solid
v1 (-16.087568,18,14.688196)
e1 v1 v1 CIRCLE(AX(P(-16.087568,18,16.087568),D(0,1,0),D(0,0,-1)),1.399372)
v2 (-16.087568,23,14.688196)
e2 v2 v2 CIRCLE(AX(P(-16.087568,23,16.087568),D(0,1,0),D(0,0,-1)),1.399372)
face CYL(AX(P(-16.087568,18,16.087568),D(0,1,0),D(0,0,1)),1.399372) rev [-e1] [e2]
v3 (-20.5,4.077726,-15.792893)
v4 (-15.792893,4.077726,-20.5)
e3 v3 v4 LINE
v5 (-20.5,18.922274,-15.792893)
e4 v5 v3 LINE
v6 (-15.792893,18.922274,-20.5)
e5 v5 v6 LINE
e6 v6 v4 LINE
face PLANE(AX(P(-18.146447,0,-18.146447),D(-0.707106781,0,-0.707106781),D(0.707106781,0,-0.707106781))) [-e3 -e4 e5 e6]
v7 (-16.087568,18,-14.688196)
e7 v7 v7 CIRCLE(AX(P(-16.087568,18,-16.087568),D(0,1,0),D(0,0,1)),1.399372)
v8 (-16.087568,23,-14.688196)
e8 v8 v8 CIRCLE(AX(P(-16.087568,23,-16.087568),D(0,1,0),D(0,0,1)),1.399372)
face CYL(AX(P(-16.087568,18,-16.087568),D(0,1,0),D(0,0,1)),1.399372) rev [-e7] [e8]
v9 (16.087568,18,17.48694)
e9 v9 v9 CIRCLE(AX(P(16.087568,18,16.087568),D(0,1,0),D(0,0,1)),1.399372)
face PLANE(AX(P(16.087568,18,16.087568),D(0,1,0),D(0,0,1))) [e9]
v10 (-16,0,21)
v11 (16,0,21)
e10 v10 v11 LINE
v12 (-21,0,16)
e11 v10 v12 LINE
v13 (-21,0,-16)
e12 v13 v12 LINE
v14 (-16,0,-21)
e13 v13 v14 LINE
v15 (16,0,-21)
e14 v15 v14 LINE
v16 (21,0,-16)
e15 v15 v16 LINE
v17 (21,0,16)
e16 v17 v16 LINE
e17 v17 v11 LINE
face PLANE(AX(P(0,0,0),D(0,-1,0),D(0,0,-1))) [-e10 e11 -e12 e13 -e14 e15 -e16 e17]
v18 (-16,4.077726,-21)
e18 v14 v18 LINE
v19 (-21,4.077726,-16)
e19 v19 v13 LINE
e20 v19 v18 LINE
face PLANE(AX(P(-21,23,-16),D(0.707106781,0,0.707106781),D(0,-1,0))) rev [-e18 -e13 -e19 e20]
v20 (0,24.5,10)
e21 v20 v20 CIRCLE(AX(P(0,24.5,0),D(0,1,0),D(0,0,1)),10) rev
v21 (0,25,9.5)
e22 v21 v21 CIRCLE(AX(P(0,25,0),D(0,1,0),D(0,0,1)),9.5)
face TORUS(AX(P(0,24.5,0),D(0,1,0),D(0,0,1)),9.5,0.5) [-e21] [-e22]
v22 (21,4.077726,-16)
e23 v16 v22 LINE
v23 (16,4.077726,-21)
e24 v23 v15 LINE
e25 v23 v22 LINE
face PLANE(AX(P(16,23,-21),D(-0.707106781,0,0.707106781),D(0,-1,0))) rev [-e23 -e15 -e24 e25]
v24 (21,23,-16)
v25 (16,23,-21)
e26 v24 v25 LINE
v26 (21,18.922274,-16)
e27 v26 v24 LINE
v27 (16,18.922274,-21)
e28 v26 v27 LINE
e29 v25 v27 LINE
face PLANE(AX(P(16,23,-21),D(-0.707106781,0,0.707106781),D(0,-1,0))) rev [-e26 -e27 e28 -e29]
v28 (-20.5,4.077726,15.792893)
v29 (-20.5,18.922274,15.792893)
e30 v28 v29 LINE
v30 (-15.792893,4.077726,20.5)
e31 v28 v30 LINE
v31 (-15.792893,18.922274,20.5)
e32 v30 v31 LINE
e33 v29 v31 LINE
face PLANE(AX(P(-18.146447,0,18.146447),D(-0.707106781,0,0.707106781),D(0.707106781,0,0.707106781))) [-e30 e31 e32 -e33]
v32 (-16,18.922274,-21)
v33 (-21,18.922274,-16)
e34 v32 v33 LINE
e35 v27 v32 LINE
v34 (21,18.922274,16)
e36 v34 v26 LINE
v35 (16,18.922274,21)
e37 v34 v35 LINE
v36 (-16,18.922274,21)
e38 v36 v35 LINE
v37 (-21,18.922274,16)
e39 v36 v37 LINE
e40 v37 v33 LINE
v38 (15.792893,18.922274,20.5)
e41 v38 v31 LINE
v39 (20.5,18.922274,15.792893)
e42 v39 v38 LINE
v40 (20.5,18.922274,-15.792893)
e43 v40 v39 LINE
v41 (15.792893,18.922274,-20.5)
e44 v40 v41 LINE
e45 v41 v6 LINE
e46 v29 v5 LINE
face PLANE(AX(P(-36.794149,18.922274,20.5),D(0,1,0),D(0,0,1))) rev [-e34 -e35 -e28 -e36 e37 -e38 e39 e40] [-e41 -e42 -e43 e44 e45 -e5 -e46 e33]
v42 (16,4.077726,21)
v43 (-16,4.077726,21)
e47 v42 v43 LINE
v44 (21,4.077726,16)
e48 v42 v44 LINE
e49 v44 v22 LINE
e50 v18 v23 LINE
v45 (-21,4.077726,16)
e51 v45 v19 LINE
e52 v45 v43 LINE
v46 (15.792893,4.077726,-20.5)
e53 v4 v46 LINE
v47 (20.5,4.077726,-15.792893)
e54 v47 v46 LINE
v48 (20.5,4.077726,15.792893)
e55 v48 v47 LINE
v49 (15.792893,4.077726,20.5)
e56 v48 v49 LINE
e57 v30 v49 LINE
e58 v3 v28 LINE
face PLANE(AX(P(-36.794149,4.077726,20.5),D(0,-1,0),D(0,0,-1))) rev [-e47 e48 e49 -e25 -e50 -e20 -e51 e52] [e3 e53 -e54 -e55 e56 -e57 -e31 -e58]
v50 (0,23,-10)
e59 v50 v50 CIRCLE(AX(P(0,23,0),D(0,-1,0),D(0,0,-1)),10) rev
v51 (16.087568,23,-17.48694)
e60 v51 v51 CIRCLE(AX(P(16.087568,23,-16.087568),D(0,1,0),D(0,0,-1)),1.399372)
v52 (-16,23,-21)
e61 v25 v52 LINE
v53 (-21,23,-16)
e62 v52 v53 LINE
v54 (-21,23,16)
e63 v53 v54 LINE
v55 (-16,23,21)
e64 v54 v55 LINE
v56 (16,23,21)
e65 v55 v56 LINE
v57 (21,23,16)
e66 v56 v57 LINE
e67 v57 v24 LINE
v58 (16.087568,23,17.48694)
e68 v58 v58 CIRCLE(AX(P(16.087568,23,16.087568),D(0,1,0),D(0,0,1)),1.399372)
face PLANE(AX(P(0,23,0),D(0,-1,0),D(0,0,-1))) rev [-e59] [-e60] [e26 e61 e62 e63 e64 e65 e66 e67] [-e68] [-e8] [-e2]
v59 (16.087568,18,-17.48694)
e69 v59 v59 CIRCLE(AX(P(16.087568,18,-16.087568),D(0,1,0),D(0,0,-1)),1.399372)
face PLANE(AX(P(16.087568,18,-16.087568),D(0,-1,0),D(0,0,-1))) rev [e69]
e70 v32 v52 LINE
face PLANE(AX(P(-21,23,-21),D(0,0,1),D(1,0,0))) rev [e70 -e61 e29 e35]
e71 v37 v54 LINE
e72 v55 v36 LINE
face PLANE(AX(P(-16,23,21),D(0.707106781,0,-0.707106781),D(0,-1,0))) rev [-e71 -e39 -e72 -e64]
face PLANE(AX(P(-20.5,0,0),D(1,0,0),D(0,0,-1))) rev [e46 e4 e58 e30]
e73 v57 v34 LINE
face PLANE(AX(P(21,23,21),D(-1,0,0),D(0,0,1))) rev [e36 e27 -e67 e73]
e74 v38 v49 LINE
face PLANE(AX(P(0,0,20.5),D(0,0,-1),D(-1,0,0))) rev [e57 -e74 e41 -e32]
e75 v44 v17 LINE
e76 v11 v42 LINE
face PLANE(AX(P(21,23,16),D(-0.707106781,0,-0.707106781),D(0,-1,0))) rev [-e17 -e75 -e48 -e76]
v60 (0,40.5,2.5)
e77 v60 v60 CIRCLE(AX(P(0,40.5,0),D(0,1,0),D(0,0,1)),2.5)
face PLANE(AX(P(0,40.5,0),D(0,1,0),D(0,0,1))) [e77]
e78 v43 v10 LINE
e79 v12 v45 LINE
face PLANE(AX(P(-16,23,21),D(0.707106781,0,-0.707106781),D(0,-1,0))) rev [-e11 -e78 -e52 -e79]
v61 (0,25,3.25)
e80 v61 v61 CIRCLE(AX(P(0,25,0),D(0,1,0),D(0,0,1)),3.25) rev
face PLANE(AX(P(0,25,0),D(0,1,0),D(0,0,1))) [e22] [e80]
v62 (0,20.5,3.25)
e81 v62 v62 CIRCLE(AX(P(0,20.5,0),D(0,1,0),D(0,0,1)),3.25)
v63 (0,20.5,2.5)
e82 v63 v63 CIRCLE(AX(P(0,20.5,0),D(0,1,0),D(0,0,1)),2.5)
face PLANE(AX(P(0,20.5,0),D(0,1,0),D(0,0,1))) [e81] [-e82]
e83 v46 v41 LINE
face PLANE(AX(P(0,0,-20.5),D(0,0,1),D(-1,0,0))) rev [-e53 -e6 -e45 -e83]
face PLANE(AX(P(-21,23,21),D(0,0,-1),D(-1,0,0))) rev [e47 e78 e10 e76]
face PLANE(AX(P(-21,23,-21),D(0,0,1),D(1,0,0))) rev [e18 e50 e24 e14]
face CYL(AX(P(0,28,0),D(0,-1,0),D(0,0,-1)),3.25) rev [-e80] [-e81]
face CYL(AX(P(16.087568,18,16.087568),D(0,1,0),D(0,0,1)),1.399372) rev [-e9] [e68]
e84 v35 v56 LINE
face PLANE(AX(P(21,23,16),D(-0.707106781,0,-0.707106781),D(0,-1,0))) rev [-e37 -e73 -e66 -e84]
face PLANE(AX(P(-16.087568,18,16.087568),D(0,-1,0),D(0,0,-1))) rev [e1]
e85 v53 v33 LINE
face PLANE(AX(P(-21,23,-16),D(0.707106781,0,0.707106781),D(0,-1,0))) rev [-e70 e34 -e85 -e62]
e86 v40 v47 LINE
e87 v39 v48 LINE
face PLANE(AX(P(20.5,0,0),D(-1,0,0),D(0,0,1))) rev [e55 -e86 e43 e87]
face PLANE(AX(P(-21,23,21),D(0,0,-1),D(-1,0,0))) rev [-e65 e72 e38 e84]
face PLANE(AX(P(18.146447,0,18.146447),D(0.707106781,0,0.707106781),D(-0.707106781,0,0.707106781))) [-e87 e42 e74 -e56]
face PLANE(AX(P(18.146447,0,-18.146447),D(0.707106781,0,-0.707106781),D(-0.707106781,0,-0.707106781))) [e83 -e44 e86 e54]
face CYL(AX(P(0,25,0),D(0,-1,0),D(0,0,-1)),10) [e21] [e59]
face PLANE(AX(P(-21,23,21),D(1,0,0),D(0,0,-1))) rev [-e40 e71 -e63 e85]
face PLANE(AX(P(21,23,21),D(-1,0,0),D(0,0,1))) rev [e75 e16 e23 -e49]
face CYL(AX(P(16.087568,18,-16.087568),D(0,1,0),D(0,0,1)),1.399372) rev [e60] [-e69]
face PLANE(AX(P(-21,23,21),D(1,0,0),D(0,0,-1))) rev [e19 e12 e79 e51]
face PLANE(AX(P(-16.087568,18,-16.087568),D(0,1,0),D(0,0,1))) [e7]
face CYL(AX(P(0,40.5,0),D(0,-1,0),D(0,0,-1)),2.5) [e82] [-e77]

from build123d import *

# Parameters (mm, degrees)
IZIM1_W                     = 42
IZIM1_H                     = 42
Y_KSEKLIK_EKSTR_ZYON1_DEPTH = 23
IZIM2_W                     = 71.608863679
IZIM2_H                     = 14.84454832
KES_EKSTR_ZYON1_DEPTH       = 0.5
PAH1_SIZE                   = 5
PAH2_SIZE                   = 5
PAH3_SIZE                   = 5
PAH4_SIZE                   = 5
IZIM3_W                     = 11.40471201
IZIM3_H                     = 14.84454832
KES_EKSTR_ZYON2_DEPTH       = 10.5
IZIM6_W                     = 48.50384319
IZIM6_H                     = 14.84454832
KES_EKSTR_ZYON3_DEPTH       = 0.5
IZIM7_W                     = 38.182763894
IZIM7_H                     = 14.84454832
KES_EKSTR_ZYON4_DEPTH       = 0.5
AYNALAMA3_COPY_1_SKETCH_W   = 11.40471201
AYNALAMA3_COPY_1_SKETCH_H   = 14.84454832
AYNALAMA3_COPY_1_DEPTH      = 10.5
AYNALAMA3_COPY_2_SKETCH_W   = 11.40471201
AYNALAMA3_COPY_2_SKETCH_H   = 14.84454832
AYNALAMA3_COPY_2_DEPTH      = 10.5
IZIM8_R                     = 1.399371897
KES_EKSTR_ZYON5_DEPTH       = 5
IZIM9_R                     = 10
Y_KSEKLIK_EKSTR_ZYON2_DEPTH = 2
KES_EKSTR_ZYON6_DEPTH       = 5
KES_EKSTR_ZYON6_DEPTH_BACK  = 2.5
IZIM10_R                    = 3.25
IZIM11_R                    = 2.5
Y_KSEKLIK_EKSTR_ZYON3_DEPTH = 20
RADYUS2_R                   = 0.5


with BuildPart() as part:
    # Çizim1 → Yükseklik-Ekstrüzyon1 (new body)
    with BuildSketch(Plane(origin=(0, 0, 0), x_dir=(1, 0, 0), z_dir=(0, 1, 0))):
        Rectangle(IZIM1_W, IZIM1_H)
    extrude(amount=Y_KSEKLIK_EKSTR_ZYON1_DEPTH)

    # Çizim2 → Kes-Ekstrüzyon1 (cut)
    with BuildSketch(Plane.XY.offset(21)):
        with Locations((-0.989717409, 11.5)):
            Rectangle(IZIM2_W, IZIM2_H)
    kes_ekstr_zyon1 = extrude(amount=-KES_EKSTR_ZYON1_DEPTH, mode=Mode.SUBTRACT)

    # Pah1
    # the kernel refuses this chamfer: 5 mm, written as the material it takes off along each edge
    with BuildSketch(Plane(origin=(-21, -12.85841494, 21), x_dir=(0.9996219169112968, 0, 0.027495876610586317), z_dir=(0, 1, 0))) as pah1_piece_1:
        Polygon((PAH1_SIZE * 0.999621916911, PAH1_SIZE * 0.0274958766106), (-PAH1_SIZE * 0.0274958766106, PAH1_SIZE * 0.999621916911), (0, 0), align=None)
    extrude(amount=29.79455572, mode=Mode.SUBTRACT)
    with BuildSketch(Plane(origin=(-21, 6.06385922, 21), x_dir=(-0.027495876610586317, 0, -0.9996219169112968), z_dir=(0, 1, 0))) as pah1_piece_2:
        Polygon((PAH1_SIZE * 0.999621916911, -PAH1_SIZE * 0.0274958766106), (-PAH1_SIZE * 0.0274958766106, -PAH1_SIZE * 0.999621916911), (0, 0), align=None)
    extrude(amount=29.79455572, mode=Mode.SUBTRACT)

    # Pah2
    # the kernel refuses this chamfer: 5 mm, written as the material it takes off along each edge
    with BuildSketch(Plane(origin=(21, -12.85841494, 21), x_dir=(-0.9996219169112968, 0, 0.027495876610586317), z_dir=(0, 1, 0)), Plane(origin=(21, 6.06385922, 21), x_dir=(-0.9996219169112968, 0, 0.027495876610586317), z_dir=(0, 1, 0))) as pah2_piece_1:
        Polygon((PAH2_SIZE * 0.999621916911, -PAH2_SIZE * 0.0274958766106), (-PAH2_SIZE * 0.0274958766106, -PAH2_SIZE * 0.999621916911), (0, 0), align=None)
    extrude(amount=29.79455572, mode=Mode.SUBTRACT)

    # Pah3
    pah3_edges = [part.edges().sort_by_distance(p)[0] for p in [
        (21, 11.5, -21),
    ]]
    chamfer(pah3_edges, length=PAH3_SIZE)

    # Pah4
    pah4_edges = [part.edges().sort_by_distance(p)[0] for p in [
        (-21, 11.5, -21),
    ]]
    chamfer(pah4_edges, length=PAH4_SIZE)

    # Çizim3 → Kes-Ekstrüzyon2 (cut)
    with BuildSketch(Plane(origin=(-25.571067812, 0, 25.571067812), x_dir=(0.707106781186546, 0, 0.707106781186549), z_dir=(-0.707106781186549, 0, 0.707106781186546))):
        with Locations((0, 11.5)):
            Rectangle(IZIM3_W, IZIM3_H)
    kes_ekstr_zyon2 = extrude(amount=-KES_EKSTR_ZYON2_DEPTH, mode=Mode.SUBTRACT)

    # Aynalama1: Kes-Ekstrüzyon1, Kes-Ekstrüzyon2 across plane
    add(kes_ekstr_zyon1.mirror(Plane.XY), mode=Mode.SUBTRACT)
    add(kes_ekstr_zyon2.mirror(Plane.XY), mode=Mode.SUBTRACT)

    # Aynalama2: Kes-Ekstrüzyon2 across plane
    add(kes_ekstr_zyon2.mirror(Plane(origin=(0, 0, 0), x_dir=(0, 0, 1), z_dir=(1, 0, 0))), mode=Mode.SUBTRACT)

    # Çizim6 → Kes-Ekstrüzyon3 (cut)
    with BuildSketch(Plane(origin=(21, 0, 0), x_dir=(0, 0, -1), z_dir=(1, 0, 0))):
        with Locations((0, 11.5)):
            Rectangle(IZIM6_W, IZIM6_H)
    extrude(amount=-KES_EKSTR_ZYON3_DEPTH, mode=Mode.SUBTRACT)

    # Çizim7 → Kes-Ekstrüzyon4 (cut)
    with BuildSketch(Plane.ZY.offset(21)):
        with Locations((0, 11.5)):
            Rectangle(IZIM7_W, IZIM7_H)
    extrude(amount=-KES_EKSTR_ZYON4_DEPTH, mode=Mode.SUBTRACT)

    # Aynalama3 copy 1 sketch → Aynalama3 copy 1 (cut)
    with BuildSketch(Plane(origin=(25.571067812, 0, -25.571067812), x_dir=(-0.707106781186546, 0, -0.707106781186549), z_dir=(0.707106781186549, 0, -0.707106781186546))):
        with Locations((0, 11.5)):
            Rectangle(AYNALAMA3_COPY_1_SKETCH_W, AYNALAMA3_COPY_1_SKETCH_H)
    extrude(amount=-AYNALAMA3_COPY_1_DEPTH, mode=Mode.SUBTRACT)

    # Aynalama3 copy 2 sketch → Aynalama3 copy 2 (cut)
    with BuildSketch(Plane(origin=(-25.571067812, 0, -25.571067812), x_dir=(0.707106781186546, 0, -0.707106781186549), z_dir=(-0.707106781186549, 0, -0.707106781186546))):
        with Locations((0, -11.5)):
            Rectangle(AYNALAMA3_COPY_2_SKETCH_W, AYNALAMA3_COPY_2_SKETCH_H)
    extrude(amount=-AYNALAMA3_COPY_2_DEPTH, mode=Mode.SUBTRACT)

    # Çizim8 → Kes-Ekstrüzyon5 (cut)
    with BuildSketch(Plane(origin=(0, 23, 0), x_dir=(1, 0, 0), z_dir=(0, 1, 0))):
        with Locations(Location((-16.087568017, 16.087568017, 0), (0, 0, 270))):
            Circle(IZIM8_R)
        with Locations(Location((16.087568017, 16.087568017, 0), (0, 0, 90))):
            Circle(IZIM8_R)
        with Locations(Location((16.087568017, -16.087568017, 0), (0, 0, 270))):
            Circle(IZIM8_R)
        with Locations(Location((-16.087568017, -16.087568017, 0), (0, 0, 90))):
            Circle(IZIM8_R)
    extrude(amount=-KES_EKSTR_ZYON5_DEPTH, mode=Mode.SUBTRACT)

    # Çizim9 → Yükseklik-Ekstrüzyon2 (add)
    with BuildSketch(Plane(origin=(0, 23, 0), x_dir=(1, 0, 0), z_dir=(0, 1, 0))):
        with Locations(Location((0, 0, 0), (0, 0, 90))):
            Circle(IZIM9_R)
    extrude(amount=Y_KSEKLIK_EKSTR_ZYON2_DEPTH)

    # Çizim10 → Kes-Ekstrüzyon6 (cut, two sides: drawn at the far end of the back side and taken through both)
    with BuildSketch(Plane(origin=(0, 23, 0), x_dir=(1, 0, 0), z_dir=(0, 1, 0)).offset(-KES_EKSTR_ZYON6_DEPTH_BACK)):
        with Locations(Location((0, 0, 0), (0, 0, 270))):
            Circle(IZIM10_R)
    extrude(amount=KES_EKSTR_ZYON6_DEPTH + KES_EKSTR_ZYON6_DEPTH_BACK, mode=Mode.SUBTRACT)

    # Çizim11 → Yükseklik-Ekstrüzyon3 (add)
    with BuildSketch(Plane(origin=(0, 20.5, 0), x_dir=(1, 0, 0), z_dir=(0, 1, 0))):
        with Locations(Location((0, 0, 0), (0, 0, 270))):
            Circle(IZIM11_R)
    extrude(amount=Y_KSEKLIK_EKSTR_ZYON3_DEPTH)

    # Radyus2
    radyus2_edges = [part.edges().sort_by_distance(p)[0] for p in [
        (0, 25, 10),
    ]]
    fillet(radyus2_edges, radius=RADYUS2_R)


solid = part.part
